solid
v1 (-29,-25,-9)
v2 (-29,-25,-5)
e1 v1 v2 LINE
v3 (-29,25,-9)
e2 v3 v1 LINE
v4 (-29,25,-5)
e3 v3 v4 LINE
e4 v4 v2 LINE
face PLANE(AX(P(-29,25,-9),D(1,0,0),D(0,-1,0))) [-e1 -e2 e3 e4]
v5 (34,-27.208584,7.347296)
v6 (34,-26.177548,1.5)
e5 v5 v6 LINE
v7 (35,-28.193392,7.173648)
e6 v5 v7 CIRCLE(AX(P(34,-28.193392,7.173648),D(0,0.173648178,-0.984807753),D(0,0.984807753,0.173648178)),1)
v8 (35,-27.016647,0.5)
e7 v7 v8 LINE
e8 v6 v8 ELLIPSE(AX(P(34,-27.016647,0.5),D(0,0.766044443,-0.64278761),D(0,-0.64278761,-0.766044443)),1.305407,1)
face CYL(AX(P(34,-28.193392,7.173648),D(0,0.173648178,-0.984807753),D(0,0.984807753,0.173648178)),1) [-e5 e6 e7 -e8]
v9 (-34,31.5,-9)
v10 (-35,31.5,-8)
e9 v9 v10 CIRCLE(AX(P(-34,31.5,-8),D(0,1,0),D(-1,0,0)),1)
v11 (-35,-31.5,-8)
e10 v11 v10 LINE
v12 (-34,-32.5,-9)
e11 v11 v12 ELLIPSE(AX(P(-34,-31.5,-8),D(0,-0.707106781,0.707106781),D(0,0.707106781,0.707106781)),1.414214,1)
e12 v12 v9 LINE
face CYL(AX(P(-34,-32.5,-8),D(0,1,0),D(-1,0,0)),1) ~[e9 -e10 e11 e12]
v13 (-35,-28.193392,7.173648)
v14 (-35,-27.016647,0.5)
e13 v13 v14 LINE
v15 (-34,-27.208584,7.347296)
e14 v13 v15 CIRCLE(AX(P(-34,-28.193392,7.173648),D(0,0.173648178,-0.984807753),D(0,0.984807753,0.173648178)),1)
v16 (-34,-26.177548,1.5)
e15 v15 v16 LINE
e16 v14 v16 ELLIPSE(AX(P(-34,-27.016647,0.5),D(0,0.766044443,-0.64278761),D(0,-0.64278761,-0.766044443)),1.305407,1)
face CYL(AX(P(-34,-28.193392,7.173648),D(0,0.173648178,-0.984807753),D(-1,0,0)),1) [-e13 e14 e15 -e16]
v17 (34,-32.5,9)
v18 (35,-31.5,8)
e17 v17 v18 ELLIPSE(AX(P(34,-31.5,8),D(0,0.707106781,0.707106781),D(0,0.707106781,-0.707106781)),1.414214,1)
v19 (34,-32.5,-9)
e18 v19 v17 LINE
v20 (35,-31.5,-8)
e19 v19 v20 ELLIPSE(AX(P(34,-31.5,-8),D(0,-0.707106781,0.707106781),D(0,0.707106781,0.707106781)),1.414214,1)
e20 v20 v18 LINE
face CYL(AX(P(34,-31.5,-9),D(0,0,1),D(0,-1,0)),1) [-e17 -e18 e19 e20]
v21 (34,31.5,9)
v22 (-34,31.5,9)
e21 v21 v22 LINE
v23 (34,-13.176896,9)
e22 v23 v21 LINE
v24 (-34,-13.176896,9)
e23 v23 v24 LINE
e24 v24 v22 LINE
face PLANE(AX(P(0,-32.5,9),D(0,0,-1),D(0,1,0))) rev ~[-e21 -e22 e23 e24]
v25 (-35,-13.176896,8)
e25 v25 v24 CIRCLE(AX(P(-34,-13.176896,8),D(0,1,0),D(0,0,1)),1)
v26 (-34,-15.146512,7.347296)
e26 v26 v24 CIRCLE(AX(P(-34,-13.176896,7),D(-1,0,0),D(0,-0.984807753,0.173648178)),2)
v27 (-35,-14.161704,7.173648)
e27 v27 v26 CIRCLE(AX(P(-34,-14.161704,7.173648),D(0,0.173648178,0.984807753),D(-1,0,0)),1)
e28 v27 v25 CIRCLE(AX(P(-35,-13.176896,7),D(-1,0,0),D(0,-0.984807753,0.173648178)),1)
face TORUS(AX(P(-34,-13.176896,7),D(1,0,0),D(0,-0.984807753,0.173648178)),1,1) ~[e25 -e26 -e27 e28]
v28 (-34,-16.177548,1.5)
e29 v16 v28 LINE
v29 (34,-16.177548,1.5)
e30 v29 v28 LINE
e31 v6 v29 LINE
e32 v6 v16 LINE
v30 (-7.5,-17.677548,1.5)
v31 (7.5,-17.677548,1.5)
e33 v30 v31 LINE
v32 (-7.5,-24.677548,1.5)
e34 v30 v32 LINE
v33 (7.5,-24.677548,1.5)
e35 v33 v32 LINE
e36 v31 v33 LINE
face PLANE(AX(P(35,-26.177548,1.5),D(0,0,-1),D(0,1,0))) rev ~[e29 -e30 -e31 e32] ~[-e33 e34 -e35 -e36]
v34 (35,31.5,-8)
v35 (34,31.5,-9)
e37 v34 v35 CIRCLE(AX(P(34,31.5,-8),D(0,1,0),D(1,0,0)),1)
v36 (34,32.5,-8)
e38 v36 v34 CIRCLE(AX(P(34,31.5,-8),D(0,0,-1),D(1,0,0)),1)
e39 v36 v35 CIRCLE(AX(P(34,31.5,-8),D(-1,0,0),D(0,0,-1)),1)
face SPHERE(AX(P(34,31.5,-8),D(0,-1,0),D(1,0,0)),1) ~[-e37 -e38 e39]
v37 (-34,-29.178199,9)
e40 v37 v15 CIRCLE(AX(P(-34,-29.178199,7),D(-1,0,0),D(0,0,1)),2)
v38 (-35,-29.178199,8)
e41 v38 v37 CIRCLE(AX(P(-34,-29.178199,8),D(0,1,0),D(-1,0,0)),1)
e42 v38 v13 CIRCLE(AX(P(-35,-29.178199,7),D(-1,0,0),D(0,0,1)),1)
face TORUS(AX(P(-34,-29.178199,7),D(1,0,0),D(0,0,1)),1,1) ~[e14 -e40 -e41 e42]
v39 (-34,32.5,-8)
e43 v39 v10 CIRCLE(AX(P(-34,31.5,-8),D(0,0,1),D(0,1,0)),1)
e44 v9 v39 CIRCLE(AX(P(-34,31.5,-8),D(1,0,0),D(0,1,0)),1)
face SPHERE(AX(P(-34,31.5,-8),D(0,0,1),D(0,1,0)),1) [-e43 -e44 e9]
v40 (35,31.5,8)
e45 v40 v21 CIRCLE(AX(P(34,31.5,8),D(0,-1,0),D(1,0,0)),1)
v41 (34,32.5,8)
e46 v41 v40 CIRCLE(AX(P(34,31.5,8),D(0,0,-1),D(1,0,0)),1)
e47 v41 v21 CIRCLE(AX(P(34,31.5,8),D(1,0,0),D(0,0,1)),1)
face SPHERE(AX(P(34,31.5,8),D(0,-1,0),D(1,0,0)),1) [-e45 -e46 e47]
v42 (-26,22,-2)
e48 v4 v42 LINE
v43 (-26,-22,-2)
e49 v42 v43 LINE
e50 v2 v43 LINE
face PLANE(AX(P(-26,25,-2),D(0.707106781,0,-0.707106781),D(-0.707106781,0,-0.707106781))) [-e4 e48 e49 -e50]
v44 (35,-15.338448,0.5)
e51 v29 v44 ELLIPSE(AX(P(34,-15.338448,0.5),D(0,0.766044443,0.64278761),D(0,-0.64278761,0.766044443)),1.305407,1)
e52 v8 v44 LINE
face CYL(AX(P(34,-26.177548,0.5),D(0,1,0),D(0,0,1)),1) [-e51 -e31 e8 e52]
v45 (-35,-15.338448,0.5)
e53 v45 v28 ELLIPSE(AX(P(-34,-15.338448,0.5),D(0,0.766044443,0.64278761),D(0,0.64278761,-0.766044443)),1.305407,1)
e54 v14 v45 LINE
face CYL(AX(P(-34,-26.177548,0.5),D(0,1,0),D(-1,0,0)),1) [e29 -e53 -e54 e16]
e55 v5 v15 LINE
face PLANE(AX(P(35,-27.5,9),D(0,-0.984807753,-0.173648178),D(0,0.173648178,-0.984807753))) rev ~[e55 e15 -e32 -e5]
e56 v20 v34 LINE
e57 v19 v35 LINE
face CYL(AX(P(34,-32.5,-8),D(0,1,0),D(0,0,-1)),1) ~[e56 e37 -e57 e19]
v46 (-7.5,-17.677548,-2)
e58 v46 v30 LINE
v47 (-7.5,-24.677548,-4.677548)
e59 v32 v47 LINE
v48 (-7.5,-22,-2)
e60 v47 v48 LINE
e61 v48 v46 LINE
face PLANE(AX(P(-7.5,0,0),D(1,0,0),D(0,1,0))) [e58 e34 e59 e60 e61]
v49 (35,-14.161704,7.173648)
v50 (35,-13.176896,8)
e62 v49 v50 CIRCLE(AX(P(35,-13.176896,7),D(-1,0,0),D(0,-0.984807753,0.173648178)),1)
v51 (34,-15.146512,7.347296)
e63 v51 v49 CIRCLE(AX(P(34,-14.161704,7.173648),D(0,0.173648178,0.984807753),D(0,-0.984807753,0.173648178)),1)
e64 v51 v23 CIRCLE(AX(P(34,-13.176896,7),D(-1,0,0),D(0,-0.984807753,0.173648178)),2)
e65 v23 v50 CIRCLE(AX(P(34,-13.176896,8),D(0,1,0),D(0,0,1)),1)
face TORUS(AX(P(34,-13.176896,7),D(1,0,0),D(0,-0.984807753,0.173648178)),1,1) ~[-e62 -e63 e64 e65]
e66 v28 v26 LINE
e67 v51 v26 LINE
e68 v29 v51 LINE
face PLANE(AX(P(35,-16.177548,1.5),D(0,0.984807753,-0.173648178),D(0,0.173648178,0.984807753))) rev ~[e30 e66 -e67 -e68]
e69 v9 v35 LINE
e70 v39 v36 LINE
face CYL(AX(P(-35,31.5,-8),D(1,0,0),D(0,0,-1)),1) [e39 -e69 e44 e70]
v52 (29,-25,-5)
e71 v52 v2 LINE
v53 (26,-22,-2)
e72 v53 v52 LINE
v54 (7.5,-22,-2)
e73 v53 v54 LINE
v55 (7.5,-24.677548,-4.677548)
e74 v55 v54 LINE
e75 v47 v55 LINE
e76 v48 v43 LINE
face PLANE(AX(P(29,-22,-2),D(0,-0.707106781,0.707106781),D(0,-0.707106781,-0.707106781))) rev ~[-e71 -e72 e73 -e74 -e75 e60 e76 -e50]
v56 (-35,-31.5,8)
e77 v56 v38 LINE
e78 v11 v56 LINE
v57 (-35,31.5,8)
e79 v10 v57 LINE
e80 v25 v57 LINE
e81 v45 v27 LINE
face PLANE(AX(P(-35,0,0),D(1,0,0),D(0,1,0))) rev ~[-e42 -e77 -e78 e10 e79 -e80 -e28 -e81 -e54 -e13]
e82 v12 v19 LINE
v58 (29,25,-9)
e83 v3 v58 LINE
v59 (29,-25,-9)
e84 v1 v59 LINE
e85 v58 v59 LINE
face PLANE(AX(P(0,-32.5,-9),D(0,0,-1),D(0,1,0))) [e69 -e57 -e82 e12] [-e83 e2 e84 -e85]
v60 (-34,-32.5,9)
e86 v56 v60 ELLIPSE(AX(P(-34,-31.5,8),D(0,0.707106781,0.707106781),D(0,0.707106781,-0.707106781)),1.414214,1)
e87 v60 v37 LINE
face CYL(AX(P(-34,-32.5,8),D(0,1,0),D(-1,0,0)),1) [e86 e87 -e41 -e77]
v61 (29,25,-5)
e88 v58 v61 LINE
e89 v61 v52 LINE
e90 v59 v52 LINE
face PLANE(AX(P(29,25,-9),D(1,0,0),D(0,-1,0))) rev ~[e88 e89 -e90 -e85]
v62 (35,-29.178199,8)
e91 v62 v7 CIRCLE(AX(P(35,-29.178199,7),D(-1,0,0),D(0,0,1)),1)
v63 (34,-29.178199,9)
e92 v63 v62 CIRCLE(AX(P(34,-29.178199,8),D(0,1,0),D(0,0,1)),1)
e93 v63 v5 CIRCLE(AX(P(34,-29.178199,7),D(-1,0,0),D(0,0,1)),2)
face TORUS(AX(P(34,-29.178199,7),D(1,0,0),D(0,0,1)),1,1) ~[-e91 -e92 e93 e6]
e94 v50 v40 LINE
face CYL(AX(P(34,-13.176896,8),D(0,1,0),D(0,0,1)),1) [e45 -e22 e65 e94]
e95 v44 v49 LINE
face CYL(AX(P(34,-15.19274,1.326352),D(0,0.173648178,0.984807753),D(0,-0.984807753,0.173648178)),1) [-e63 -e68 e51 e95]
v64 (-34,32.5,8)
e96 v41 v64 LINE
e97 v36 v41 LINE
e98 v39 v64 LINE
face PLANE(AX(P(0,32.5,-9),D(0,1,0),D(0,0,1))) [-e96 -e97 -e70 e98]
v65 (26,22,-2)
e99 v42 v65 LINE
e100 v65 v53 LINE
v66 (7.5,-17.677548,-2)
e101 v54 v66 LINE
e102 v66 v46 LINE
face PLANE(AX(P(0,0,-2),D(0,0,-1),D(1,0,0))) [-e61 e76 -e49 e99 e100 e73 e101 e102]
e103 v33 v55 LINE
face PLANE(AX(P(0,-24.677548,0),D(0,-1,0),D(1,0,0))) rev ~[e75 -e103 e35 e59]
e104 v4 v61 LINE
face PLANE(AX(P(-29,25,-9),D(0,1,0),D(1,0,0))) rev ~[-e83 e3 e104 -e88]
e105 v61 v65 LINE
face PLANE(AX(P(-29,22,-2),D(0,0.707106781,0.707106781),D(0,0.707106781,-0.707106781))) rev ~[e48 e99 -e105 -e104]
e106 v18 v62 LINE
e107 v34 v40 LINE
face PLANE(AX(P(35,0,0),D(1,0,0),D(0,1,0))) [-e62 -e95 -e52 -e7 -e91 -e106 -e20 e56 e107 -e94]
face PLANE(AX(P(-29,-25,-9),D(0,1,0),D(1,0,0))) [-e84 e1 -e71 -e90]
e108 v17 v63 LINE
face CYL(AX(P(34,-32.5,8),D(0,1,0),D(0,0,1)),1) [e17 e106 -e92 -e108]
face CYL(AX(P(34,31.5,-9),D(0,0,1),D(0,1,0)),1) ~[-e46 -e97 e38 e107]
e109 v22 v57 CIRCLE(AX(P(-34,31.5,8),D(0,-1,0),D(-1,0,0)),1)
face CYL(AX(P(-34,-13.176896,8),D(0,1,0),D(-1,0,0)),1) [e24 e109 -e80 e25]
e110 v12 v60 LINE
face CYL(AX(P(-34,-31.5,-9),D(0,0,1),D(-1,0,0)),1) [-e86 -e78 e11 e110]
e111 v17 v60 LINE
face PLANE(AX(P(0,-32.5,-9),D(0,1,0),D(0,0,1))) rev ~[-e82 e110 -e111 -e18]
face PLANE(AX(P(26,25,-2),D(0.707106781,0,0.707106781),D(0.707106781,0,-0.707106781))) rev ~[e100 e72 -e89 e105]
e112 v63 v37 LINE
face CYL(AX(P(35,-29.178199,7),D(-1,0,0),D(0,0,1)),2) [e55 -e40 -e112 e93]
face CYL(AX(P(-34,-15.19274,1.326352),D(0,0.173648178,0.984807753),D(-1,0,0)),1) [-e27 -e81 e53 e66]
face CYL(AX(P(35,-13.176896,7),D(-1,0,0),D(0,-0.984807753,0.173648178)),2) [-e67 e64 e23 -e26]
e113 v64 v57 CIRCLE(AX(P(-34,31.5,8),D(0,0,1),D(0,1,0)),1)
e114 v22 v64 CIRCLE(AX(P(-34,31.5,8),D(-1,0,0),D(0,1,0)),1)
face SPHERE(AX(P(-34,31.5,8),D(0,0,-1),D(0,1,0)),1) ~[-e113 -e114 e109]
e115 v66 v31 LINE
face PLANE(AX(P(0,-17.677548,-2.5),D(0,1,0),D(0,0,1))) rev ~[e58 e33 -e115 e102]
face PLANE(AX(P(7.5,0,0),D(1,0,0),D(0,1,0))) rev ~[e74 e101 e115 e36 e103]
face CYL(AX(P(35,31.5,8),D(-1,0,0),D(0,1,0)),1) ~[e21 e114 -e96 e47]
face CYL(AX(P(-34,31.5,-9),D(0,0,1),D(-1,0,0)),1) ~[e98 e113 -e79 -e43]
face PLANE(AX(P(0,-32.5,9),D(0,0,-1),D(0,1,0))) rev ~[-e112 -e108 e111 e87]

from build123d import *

# Parameters (mm, degrees)
F0_W          = 65
F0_H          = 18
F1_DEPTH      = 35
F3_DEPTH      = 70.001
F4_R          = 2
F5_R          = 1
F6_W          = 7
F6_H          = 3
F7_DEPTH      = 7.5
F8_W          = 58
F8_H          = 50
F9_DEPTH      = 7
F10_T1_DEPTH  = 50
F10_T3_DEPTH  = 58
F10_T8_DEPTH  = 65.7150489639
F10_T13_DEPTH = 58
F10_T18_DEPTH = 65.7150489639


# Not quite as in the source:
# - a fillet or chamfer that OpenCascade refuses, or shapes differently, is made with other operations: its cross-section is extruded or revolved along the edge and cut away or added


with BuildPart() as f1:
    # F0 (on Right) → F1 (new body, symmetric)
    with BuildSketch(Plane.YZ):
        Rectangle(F0_W, F0_H)
    extrude(amount=F1_DEPTH, both=True)

    # F2 (on face) → F3 (cut, through all)
    with BuildSketch(Plane.YZ.offset(35)):
        Polygon((-14.8550952894, 9), (-27.5, 9), (-26.1775476447, 1.5), (-16.1775476447, 1.5), align=None)
        Polygon((-21.5490479022, 13.5265095159), (-32.5, 9), (-27.5, 9), (-14.8550952894, 9), align=None)
    extrude(amount=-F3_DEPTH, mode=Mode.SUBTRACT)

    # F4
    f4_edges = [f1.edges().sort_by_distance(p)[0] for p in [
        (0, -14.855095, 9),
        (0, -27.5, 9),
    ]]
    fillet(f4_edges, radius=F4_R)

    # F5
    f5_edges = [f1.edges().sort_by_distance(p)[0] for p in [
        (35, 9.661552, 9),
        (35, -30.8391, 9),
        (35, -27.892624, 8.532089),
        (35, -32.5, 0),
        (35, -26.693066, 4.423648),
        (35, 0, -9),
        (35, -21.177548, 1.5),
        (35, 32.5, 0),
        (35, -15.66203, 4.423648),
        (35, -14.462471, 8.532089),
        (-35, 32.5, 0),
        (0, 32.5, 9),
        (0, 32.5, -9),
        (-35, -30.8391, 9),
        (-35, -27.892624, 8.532089),
        (-35, -32.5, 0),
        (-35, -26.693066, 4.423648),
        (-35, 0, -9),
        (-35, -21.177548, 1.5),
        (-35, -15.66203, 4.423648),
        (-35, 9.661552, 9),
        (-35, -14.462471, 8.532089),
    ]]
    fillet(f5_edges, radius=F5_R)

    # F6 (on Right) → F7 (cut, symmetric)
    with BuildSketch(Plane.YZ):
        with Locations((-21.1775476447, -1)):
            Rectangle(F6_W, F6_H)
        with Locations((-21.1775476447, 2)):
            Rectangle(F6_W, F6_H)
    extrude(amount=F7_DEPTH, both=True, mode=Mode.SUBTRACT)

    # F8 (on face) → F9 (cut)
    with BuildSketch(Plane(origin=(0, 0, -9), x_dir=(1, 0, 0), z_dir=(0, 0, -1))):
        Rectangle(F8_W, F8_H)
    extrude(amount=-F9_DEPTH, mode=Mode.SUBTRACT)

    # F10: chamfer of 3 on 4 edges, made by hand

    # F10_s2 → F10_t1 (join)
    with BuildSketch(Plane.XZ.offset(-25)):
        Polygon((26, -2), (29, -5), (29, -2), align=None)
        Polygon((-26, -2), (-29, -5), (-29, -2), align=None)
    extrude(amount=F10_T1_DEPTH)

    # F10_s4 → F10_t3 (join)
    with BuildSketch(Plane.YZ.offset(-29)):
        Polygon((22, -2), (25, -5), (25, -2), align=None)
    extrude(amount=F10_T3_DEPTH)


with BuildPart() as f10_tool6:
    # F10_s7 → F10_t8 (new body)
    with BuildSketch(Plane.YZ.offset(29)):
        Polygon((-22, -2), (-25, -5), (-25, -2), align=None)
    extrude(amount=-F10_T8_DEPTH)

    split(bisect_by=Plane.YZ.offset(7.5), keep=Keep.TOP)


with BuildPart() as f1_1:
    add(f1.part)

    # F10_t5: union F10_tool6
    add(f10_tool6.part)


with BuildPart() as f10_tool11:
    # F10_s12 → F10_t13 (new body)
    with BuildSketch(Plane.YZ.offset(29)):
        Polygon((-22, -2), (-25, -5), (-25, -2), align=None)
    extrude(amount=-F10_T13_DEPTH)

    split(bisect_by=Plane.XZ.offset(24.6775476447), keep=Keep.TOP)


with BuildPart() as f1_2:
    add(f1_1.part)

    # F10_t10: union F10_tool11
    add(f10_tool11.part)


with BuildPart() as f10_tool16:
    # F10_s17 → F10_t18 (new body)
    with BuildSketch(Plane.YZ.offset(36.7150489639)):
        Polygon((-22, -2), (-25, -5), (-25, -2), align=None)
    extrude(amount=-F10_T18_DEPTH)

    split(bisect_by=Plane.YZ.offset(-7.5), keep=Keep.BOTTOM)


with BuildPart() as f1_3:
    add(f1_2.part)

    # F10_t15: union F10_tool16
    add(f10_tool16.part)


solid = f1_3.part
